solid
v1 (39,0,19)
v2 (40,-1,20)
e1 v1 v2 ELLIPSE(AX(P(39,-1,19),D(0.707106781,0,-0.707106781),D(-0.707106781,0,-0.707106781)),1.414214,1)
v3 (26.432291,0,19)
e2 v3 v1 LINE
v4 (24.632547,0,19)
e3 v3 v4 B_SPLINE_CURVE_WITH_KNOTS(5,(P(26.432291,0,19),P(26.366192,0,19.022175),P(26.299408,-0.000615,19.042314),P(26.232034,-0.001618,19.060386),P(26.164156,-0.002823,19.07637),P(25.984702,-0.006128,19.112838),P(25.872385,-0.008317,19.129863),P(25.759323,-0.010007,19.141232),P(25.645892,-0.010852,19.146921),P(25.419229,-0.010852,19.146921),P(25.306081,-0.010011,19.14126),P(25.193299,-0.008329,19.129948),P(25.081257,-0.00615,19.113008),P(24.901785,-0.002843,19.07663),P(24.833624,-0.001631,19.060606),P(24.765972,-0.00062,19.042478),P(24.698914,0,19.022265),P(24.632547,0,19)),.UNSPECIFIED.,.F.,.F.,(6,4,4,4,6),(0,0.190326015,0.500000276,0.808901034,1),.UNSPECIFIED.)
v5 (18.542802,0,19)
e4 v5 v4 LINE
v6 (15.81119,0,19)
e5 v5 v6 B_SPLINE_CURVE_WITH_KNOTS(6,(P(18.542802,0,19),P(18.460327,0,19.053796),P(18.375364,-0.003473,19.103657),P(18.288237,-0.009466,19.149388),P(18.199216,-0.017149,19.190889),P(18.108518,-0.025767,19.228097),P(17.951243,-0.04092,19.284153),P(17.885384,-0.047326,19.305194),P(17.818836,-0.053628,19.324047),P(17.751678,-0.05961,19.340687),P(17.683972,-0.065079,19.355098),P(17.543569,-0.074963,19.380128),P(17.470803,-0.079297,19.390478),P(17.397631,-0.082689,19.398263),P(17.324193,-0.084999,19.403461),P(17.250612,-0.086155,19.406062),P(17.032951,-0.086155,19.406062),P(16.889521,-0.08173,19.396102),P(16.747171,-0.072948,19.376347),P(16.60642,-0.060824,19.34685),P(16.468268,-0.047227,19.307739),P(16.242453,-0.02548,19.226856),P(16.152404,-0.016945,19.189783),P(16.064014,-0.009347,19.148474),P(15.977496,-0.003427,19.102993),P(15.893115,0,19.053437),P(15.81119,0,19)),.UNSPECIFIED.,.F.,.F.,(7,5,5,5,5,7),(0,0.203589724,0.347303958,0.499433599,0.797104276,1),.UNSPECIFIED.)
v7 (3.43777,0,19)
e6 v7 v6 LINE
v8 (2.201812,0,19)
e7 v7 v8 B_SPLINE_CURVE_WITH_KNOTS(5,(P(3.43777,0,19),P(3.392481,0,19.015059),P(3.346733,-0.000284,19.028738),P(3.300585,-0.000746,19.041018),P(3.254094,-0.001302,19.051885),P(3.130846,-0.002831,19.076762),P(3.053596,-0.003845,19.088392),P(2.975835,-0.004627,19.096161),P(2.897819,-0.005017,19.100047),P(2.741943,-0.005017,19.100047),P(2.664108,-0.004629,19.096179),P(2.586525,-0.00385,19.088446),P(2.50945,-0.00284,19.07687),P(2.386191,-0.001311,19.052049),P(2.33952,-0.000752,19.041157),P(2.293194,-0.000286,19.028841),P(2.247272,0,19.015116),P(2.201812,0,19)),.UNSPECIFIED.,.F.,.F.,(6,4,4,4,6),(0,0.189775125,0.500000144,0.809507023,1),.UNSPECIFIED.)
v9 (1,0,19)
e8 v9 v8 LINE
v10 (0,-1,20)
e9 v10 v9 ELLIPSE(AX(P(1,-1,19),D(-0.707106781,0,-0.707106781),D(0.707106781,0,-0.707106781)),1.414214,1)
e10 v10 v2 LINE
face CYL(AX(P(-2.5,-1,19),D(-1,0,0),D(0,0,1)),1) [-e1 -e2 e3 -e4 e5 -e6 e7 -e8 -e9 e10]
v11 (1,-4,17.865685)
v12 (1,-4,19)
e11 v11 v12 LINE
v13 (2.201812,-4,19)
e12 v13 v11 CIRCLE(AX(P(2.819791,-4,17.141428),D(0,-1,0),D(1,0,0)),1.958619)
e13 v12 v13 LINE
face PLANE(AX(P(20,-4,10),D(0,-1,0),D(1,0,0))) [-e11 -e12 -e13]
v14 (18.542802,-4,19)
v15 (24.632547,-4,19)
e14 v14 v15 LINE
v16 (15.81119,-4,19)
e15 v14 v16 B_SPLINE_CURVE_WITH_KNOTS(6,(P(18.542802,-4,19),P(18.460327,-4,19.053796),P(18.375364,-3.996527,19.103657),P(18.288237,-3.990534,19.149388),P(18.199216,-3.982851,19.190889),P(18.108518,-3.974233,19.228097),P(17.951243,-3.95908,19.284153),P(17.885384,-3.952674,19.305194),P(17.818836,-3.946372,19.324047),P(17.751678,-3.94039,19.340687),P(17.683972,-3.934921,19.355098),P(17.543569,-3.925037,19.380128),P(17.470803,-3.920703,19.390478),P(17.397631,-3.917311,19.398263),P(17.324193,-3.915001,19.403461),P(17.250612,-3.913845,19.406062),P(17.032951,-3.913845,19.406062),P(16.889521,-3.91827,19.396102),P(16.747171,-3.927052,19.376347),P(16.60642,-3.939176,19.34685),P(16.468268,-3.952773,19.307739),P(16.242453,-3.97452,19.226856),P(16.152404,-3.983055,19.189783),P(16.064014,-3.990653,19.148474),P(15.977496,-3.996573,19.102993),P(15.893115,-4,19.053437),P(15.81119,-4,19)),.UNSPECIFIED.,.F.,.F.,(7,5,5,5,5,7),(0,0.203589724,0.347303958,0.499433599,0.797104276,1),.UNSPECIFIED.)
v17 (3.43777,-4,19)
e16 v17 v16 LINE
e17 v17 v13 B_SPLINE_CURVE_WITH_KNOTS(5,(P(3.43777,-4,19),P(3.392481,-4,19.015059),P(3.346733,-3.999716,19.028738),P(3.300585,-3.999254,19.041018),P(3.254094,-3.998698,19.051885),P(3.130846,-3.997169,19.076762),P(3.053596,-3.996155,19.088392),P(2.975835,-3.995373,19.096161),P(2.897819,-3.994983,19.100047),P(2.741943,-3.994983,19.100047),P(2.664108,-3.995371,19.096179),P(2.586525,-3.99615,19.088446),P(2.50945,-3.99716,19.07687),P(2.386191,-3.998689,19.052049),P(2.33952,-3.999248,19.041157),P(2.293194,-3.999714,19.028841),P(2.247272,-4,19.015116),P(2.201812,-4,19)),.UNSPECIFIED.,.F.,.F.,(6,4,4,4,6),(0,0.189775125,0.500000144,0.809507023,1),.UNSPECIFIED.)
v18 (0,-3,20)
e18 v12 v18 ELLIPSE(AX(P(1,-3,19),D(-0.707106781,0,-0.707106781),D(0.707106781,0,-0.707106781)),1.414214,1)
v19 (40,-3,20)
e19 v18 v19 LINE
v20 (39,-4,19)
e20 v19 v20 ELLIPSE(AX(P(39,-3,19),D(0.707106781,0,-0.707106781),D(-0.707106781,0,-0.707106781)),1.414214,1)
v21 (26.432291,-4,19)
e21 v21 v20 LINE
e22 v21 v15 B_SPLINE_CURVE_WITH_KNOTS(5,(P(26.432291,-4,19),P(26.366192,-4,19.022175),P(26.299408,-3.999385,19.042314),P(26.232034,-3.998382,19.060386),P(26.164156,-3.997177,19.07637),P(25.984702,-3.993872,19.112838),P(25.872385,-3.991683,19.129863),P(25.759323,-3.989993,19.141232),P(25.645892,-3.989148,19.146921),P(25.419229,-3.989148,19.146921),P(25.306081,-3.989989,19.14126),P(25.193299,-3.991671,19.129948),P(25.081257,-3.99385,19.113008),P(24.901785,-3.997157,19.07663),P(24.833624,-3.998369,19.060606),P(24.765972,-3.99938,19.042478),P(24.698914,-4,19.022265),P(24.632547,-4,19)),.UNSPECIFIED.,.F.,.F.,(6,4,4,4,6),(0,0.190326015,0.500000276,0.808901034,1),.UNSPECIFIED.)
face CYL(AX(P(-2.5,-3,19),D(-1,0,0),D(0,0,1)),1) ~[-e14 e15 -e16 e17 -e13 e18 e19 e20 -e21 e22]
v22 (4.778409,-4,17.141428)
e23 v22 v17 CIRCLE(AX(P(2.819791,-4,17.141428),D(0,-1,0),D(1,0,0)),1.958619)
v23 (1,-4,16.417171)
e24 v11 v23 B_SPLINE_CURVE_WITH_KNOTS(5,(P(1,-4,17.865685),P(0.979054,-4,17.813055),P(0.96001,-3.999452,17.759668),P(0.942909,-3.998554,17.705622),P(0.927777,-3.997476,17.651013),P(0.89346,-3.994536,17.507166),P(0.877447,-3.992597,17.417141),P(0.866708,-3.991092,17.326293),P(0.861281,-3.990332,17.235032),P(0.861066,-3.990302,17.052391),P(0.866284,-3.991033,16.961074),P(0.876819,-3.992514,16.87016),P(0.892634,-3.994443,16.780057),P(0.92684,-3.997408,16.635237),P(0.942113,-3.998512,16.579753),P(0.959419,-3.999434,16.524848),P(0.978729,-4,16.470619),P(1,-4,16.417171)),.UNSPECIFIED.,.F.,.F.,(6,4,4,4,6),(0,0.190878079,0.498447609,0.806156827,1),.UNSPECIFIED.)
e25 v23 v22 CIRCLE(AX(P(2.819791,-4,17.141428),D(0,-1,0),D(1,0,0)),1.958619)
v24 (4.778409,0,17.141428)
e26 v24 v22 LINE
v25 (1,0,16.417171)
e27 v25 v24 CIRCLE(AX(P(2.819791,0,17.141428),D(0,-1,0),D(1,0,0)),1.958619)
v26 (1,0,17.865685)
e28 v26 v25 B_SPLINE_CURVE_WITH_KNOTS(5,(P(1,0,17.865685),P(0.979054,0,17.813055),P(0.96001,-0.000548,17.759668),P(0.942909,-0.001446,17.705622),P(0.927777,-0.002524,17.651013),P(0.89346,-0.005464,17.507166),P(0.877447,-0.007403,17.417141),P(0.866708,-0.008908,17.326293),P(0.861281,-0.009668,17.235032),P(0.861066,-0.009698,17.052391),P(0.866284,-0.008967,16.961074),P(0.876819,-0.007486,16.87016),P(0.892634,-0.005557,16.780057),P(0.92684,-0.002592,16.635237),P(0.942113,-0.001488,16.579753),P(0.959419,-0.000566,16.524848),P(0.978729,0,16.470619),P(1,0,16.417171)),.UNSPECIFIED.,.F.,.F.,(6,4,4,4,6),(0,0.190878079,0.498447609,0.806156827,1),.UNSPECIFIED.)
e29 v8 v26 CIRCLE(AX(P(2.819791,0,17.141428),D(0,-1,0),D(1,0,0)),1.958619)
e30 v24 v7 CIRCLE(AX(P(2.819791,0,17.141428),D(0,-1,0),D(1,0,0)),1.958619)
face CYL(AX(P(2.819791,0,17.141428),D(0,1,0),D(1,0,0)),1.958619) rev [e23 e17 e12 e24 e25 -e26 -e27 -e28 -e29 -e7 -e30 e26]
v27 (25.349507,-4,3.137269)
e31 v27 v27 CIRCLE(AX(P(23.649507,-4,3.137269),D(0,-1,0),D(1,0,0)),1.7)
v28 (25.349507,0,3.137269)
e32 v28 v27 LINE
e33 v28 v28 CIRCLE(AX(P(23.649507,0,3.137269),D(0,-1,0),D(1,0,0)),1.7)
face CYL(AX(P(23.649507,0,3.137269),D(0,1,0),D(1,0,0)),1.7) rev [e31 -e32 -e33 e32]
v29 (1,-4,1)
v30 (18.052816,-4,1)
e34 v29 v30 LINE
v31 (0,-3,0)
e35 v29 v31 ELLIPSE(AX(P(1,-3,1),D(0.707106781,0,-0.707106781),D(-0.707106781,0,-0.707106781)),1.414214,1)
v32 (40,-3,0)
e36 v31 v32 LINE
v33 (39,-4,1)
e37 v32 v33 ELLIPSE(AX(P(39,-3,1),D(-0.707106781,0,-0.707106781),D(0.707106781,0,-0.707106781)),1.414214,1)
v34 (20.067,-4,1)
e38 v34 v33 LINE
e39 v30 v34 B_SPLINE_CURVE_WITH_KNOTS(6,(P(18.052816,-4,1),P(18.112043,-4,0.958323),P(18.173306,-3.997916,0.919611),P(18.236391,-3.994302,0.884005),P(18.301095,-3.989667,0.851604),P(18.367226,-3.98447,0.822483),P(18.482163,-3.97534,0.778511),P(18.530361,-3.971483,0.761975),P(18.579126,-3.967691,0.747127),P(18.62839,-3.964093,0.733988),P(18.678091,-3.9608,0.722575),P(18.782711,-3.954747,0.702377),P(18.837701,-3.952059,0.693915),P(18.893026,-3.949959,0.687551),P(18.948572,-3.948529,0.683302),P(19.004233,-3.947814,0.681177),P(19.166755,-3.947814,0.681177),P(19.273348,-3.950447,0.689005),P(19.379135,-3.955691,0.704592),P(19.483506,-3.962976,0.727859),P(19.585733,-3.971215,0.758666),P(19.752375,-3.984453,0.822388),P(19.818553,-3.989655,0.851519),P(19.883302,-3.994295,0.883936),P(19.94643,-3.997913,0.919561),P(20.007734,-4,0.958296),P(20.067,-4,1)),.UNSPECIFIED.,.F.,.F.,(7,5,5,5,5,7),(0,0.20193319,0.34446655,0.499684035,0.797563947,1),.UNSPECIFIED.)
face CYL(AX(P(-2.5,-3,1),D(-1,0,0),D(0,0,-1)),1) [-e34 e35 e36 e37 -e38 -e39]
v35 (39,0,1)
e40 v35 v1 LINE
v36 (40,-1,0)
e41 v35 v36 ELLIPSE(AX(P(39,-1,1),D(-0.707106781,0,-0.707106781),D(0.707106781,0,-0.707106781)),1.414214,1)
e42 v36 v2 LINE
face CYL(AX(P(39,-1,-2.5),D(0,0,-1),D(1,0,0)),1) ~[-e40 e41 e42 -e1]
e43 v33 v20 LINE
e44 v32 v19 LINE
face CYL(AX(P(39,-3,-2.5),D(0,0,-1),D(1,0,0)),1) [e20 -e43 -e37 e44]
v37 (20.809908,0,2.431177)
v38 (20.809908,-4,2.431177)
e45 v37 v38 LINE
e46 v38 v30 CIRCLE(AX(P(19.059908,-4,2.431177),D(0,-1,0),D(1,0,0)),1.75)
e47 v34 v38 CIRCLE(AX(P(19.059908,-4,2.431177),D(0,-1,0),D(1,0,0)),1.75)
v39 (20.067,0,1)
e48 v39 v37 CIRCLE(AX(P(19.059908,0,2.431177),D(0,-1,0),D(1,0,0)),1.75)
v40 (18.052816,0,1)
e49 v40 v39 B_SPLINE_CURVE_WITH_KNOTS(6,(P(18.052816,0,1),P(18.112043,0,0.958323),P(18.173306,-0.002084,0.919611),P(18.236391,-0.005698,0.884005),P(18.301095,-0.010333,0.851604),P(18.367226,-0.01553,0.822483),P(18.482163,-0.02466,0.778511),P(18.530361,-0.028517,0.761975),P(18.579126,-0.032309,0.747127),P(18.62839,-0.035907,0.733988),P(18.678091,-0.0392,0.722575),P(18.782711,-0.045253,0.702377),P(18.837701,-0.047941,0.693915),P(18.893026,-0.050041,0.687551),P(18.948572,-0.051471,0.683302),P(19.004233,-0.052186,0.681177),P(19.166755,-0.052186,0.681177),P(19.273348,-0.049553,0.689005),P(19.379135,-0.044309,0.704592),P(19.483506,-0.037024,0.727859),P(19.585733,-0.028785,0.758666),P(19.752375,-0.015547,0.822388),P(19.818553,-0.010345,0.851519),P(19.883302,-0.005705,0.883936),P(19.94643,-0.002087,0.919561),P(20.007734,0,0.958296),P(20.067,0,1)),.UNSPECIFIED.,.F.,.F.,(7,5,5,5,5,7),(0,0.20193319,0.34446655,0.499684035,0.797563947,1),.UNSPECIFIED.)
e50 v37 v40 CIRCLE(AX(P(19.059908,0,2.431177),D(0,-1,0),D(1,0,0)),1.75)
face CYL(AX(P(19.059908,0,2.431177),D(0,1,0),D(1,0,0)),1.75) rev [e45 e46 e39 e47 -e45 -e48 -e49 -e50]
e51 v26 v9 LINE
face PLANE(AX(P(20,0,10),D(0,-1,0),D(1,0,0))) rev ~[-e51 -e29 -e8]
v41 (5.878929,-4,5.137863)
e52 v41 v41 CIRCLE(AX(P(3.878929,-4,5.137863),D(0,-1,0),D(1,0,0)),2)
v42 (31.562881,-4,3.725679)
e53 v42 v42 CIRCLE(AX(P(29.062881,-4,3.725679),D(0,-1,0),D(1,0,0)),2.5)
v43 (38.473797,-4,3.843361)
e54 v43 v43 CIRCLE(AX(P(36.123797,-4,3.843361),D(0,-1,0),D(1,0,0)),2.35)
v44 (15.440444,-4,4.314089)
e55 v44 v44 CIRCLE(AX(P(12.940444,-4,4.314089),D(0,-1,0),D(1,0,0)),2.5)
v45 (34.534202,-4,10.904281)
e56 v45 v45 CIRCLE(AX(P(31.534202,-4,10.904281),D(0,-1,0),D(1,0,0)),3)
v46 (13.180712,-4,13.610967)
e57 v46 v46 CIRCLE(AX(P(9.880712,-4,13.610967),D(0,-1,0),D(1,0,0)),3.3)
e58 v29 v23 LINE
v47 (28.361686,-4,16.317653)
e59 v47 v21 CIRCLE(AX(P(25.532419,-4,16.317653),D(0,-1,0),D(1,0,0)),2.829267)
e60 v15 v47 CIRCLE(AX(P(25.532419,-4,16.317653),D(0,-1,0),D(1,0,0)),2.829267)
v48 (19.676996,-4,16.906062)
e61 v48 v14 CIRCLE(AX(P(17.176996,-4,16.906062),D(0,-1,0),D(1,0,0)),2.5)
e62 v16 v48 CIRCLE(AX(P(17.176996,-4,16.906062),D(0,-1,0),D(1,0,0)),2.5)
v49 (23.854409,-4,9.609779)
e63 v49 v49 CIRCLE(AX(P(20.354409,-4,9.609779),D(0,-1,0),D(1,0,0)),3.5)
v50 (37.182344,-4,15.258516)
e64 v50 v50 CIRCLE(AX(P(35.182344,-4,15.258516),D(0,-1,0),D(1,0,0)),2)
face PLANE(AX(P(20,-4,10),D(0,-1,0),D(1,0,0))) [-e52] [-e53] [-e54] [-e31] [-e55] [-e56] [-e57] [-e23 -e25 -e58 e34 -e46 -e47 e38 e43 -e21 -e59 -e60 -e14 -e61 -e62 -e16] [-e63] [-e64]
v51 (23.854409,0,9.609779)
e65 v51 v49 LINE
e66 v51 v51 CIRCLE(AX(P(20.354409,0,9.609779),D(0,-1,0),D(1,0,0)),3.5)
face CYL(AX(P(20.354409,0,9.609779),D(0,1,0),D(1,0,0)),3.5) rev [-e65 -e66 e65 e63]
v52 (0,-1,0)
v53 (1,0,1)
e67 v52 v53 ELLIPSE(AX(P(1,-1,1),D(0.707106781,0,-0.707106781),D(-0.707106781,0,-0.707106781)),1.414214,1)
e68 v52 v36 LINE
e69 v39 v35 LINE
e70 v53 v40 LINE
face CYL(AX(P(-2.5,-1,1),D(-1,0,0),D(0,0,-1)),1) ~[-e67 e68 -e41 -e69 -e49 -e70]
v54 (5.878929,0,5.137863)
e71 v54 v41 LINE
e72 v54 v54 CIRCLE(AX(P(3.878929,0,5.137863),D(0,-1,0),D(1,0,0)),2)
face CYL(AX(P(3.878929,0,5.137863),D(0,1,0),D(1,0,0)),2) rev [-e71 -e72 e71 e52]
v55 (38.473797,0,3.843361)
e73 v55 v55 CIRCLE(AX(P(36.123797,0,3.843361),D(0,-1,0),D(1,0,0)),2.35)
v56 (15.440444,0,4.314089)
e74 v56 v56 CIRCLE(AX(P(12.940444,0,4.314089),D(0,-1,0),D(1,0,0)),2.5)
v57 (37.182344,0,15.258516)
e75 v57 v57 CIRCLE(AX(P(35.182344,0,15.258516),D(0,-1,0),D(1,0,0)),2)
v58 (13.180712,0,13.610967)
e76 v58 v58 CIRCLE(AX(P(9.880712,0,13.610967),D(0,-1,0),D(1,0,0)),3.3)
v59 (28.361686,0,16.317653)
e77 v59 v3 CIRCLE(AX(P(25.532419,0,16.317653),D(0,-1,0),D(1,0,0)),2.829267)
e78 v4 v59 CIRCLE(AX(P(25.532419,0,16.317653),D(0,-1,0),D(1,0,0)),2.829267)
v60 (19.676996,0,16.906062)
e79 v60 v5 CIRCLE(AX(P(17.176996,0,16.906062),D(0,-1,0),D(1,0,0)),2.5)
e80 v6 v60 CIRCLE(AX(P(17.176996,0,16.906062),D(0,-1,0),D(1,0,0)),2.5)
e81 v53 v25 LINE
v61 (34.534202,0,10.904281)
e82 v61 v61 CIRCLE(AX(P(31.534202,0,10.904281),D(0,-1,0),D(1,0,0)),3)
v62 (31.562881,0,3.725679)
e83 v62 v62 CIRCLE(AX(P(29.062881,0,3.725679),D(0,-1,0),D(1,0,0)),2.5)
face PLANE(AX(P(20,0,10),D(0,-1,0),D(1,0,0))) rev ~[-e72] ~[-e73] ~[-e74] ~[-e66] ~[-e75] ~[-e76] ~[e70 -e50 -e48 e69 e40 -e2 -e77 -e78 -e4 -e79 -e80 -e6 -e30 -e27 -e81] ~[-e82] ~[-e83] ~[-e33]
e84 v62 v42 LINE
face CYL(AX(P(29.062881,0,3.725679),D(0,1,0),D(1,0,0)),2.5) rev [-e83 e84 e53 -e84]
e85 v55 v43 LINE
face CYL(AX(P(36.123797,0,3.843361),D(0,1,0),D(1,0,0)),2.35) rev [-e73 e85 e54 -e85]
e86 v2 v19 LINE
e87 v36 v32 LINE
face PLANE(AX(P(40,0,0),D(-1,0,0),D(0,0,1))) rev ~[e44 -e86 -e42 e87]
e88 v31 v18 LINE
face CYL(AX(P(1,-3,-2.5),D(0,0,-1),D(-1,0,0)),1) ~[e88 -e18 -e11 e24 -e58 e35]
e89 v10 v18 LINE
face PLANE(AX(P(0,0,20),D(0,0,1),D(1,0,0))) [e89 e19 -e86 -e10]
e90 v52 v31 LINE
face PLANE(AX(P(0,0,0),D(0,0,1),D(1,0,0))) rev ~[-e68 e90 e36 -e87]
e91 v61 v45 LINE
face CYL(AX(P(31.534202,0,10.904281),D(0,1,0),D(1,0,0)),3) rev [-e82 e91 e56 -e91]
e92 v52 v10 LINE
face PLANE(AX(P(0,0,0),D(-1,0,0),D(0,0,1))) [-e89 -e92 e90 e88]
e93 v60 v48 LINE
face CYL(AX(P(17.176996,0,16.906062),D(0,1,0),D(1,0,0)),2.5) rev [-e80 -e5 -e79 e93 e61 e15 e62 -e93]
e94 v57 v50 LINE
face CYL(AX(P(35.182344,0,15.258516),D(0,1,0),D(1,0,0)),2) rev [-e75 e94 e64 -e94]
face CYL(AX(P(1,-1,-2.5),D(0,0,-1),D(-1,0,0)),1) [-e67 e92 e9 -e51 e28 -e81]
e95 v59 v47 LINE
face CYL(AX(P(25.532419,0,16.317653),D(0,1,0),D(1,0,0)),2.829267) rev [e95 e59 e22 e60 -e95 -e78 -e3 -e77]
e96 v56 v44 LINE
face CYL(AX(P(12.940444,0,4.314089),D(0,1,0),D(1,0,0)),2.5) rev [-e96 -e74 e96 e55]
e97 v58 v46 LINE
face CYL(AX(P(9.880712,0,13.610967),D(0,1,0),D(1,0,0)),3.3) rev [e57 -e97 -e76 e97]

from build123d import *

# Parameters (mm, degrees)
F0_W        = 40
F0_H        = 20
F0_R        = 1.75
F0_R_2      = 2.5
F0_R_3      = 2
F0_R_4      = 1.7
F0_R_5      = 2.35
F0_R_6      = 3.5
F0_R_7      = 3.3
F0_R_8      = 1.9586185138
F0_R_9      = 3
F0_R_10     = 2.8292671529
F1_DEPTH    = 4
F2_T1_DEPTH = 25
F2_T3_DEPTH = 45


# Not quite as in the source:
# - a fillet or chamfer that OpenCascade refuses, or shapes differently, is made with other operations: its cross-section is extruded or revolved along the edge and cut away or added


with BuildPart() as f1:
    # F0 (on Front) → F1 (new body)
    with BuildSketch(Plane.XZ):
        with Locations((20, 10)):
            Rectangle(F0_W, F0_H)
        with Locations((19.0599078035, 2.4311765472)):
            Circle(F0_R, mode=Mode.SUBTRACT)
        with Locations((12.9404438354, 4.3140889982)):
            Circle(F0_R_2, mode=Mode.SUBTRACT)
        with Locations((3.878928961, 5.1378629939)):
            Circle(F0_R_3, mode=Mode.SUBTRACT)
        with Locations((23.6495067011, 3.1372687739)):
            Circle(F0_R_4, mode=Mode.SUBTRACT)
        with Locations((29.0628805159, 3.7256787709)):
            Circle(F0_R_2, mode=Mode.SUBTRACT)
        with Locations((36.1237967933, 3.8433607703)):
            Circle(F0_R_5, mode=Mode.SUBTRACT)
        with Locations((20.3544088753, 9.6097794314)):
            Circle(F0_R_6, mode=Mode.SUBTRACT)
        with Locations((9.8807118513, 13.6109674106)):
            Circle(F0_R_7, mode=Mode.SUBTRACT)
        with Locations((2.8197907362, 17.1414283137)):
            Circle(F0_R_8, mode=Mode.SUBTRACT)
        with Locations((17.1769958133, 16.9060624719)):
            Circle(F0_R_2, mode=Mode.SUBTRACT)
        with Locations((31.5342015816, 10.9042814246)):
            Circle(F0_R_9, mode=Mode.SUBTRACT)
        with Locations((25.5324186913, 16.3176533965)):
            Circle(F0_R_10, mode=Mode.SUBTRACT)
        with Locations((35.1823444841, 15.2585163235)):
            Circle(F0_R_3, mode=Mode.SUBTRACT)
    extrude(amount=F1_DEPTH)

    # F2: fillet of radius 1 on 8 edges, made by hand

    # F2_s2 → F2_t1 (cut)
    with BuildSketch(Plane.XY.offset(-2.5)):
        with BuildLine():
            ThreePointArc((0, -3), (0.2928932188, -3.7071067812), (1, -4))
            Line((1, -4), (0, -4))
            Line((0, -4), (0, -3))
        make_face()
        with BuildLine():
            ThreePointArc((40, -3), (39.7071067812, -3.7071067812), (39, -4))
            Line((39, -4), (40, -4))
            Line((40, -4), (40, -3))
        make_face()
        with BuildLine():
            ThreePointArc((0, -1), (0.2928932188, -0.2928932188), (1, 0))
            Line((1, 0), (0, 0))
            Line((0, 0), (0, -1))
        make_face()
        with BuildLine():
            ThreePointArc((40, -1), (39.7071067812, -0.2928932188), (39, 0))
            Line((39, 0), (40, 0))
            Line((40, 0), (40, -1))
        make_face()
    extrude(amount=F2_T1_DEPTH, mode=Mode.SUBTRACT)

    # F2_s4 → F2_t3 (cut)
    with BuildSketch(Plane.YZ.offset(-2.5)):
        with BuildLine():
            ThreePointArc((-3, 20), (-3.7071067812, 19.7071067812), (-4, 19))
            Line((-4, 19), (-4, 20))
            Line((-4, 20), (-3, 20))
        make_face()
        with BuildLine():
            ThreePointArc((-3, 0), (-3.7071067812, 0.2928932188), (-4, 1))
            Line((-4, 1), (-4, 0))
            Line((-4, 0), (-3, 0))
        make_face()
        with BuildLine():
            ThreePointArc((-1, 20), (-0.2928932188, 19.7071067812), (0, 19))
            Line((0, 19), (0, 20))
            Line((0, 20), (-1, 20))
        make_face()
        with BuildLine():
            ThreePointArc((-1, 0), (-0.2928932188, 0.2928932188), (0, 1))
            Line((0, 1), (0, 0))
            Line((0, 0), (-1, 0))
        make_face()
    extrude(amount=F2_T3_DEPTH, mode=Mode.SUBTRACT)


solid = f1.part
